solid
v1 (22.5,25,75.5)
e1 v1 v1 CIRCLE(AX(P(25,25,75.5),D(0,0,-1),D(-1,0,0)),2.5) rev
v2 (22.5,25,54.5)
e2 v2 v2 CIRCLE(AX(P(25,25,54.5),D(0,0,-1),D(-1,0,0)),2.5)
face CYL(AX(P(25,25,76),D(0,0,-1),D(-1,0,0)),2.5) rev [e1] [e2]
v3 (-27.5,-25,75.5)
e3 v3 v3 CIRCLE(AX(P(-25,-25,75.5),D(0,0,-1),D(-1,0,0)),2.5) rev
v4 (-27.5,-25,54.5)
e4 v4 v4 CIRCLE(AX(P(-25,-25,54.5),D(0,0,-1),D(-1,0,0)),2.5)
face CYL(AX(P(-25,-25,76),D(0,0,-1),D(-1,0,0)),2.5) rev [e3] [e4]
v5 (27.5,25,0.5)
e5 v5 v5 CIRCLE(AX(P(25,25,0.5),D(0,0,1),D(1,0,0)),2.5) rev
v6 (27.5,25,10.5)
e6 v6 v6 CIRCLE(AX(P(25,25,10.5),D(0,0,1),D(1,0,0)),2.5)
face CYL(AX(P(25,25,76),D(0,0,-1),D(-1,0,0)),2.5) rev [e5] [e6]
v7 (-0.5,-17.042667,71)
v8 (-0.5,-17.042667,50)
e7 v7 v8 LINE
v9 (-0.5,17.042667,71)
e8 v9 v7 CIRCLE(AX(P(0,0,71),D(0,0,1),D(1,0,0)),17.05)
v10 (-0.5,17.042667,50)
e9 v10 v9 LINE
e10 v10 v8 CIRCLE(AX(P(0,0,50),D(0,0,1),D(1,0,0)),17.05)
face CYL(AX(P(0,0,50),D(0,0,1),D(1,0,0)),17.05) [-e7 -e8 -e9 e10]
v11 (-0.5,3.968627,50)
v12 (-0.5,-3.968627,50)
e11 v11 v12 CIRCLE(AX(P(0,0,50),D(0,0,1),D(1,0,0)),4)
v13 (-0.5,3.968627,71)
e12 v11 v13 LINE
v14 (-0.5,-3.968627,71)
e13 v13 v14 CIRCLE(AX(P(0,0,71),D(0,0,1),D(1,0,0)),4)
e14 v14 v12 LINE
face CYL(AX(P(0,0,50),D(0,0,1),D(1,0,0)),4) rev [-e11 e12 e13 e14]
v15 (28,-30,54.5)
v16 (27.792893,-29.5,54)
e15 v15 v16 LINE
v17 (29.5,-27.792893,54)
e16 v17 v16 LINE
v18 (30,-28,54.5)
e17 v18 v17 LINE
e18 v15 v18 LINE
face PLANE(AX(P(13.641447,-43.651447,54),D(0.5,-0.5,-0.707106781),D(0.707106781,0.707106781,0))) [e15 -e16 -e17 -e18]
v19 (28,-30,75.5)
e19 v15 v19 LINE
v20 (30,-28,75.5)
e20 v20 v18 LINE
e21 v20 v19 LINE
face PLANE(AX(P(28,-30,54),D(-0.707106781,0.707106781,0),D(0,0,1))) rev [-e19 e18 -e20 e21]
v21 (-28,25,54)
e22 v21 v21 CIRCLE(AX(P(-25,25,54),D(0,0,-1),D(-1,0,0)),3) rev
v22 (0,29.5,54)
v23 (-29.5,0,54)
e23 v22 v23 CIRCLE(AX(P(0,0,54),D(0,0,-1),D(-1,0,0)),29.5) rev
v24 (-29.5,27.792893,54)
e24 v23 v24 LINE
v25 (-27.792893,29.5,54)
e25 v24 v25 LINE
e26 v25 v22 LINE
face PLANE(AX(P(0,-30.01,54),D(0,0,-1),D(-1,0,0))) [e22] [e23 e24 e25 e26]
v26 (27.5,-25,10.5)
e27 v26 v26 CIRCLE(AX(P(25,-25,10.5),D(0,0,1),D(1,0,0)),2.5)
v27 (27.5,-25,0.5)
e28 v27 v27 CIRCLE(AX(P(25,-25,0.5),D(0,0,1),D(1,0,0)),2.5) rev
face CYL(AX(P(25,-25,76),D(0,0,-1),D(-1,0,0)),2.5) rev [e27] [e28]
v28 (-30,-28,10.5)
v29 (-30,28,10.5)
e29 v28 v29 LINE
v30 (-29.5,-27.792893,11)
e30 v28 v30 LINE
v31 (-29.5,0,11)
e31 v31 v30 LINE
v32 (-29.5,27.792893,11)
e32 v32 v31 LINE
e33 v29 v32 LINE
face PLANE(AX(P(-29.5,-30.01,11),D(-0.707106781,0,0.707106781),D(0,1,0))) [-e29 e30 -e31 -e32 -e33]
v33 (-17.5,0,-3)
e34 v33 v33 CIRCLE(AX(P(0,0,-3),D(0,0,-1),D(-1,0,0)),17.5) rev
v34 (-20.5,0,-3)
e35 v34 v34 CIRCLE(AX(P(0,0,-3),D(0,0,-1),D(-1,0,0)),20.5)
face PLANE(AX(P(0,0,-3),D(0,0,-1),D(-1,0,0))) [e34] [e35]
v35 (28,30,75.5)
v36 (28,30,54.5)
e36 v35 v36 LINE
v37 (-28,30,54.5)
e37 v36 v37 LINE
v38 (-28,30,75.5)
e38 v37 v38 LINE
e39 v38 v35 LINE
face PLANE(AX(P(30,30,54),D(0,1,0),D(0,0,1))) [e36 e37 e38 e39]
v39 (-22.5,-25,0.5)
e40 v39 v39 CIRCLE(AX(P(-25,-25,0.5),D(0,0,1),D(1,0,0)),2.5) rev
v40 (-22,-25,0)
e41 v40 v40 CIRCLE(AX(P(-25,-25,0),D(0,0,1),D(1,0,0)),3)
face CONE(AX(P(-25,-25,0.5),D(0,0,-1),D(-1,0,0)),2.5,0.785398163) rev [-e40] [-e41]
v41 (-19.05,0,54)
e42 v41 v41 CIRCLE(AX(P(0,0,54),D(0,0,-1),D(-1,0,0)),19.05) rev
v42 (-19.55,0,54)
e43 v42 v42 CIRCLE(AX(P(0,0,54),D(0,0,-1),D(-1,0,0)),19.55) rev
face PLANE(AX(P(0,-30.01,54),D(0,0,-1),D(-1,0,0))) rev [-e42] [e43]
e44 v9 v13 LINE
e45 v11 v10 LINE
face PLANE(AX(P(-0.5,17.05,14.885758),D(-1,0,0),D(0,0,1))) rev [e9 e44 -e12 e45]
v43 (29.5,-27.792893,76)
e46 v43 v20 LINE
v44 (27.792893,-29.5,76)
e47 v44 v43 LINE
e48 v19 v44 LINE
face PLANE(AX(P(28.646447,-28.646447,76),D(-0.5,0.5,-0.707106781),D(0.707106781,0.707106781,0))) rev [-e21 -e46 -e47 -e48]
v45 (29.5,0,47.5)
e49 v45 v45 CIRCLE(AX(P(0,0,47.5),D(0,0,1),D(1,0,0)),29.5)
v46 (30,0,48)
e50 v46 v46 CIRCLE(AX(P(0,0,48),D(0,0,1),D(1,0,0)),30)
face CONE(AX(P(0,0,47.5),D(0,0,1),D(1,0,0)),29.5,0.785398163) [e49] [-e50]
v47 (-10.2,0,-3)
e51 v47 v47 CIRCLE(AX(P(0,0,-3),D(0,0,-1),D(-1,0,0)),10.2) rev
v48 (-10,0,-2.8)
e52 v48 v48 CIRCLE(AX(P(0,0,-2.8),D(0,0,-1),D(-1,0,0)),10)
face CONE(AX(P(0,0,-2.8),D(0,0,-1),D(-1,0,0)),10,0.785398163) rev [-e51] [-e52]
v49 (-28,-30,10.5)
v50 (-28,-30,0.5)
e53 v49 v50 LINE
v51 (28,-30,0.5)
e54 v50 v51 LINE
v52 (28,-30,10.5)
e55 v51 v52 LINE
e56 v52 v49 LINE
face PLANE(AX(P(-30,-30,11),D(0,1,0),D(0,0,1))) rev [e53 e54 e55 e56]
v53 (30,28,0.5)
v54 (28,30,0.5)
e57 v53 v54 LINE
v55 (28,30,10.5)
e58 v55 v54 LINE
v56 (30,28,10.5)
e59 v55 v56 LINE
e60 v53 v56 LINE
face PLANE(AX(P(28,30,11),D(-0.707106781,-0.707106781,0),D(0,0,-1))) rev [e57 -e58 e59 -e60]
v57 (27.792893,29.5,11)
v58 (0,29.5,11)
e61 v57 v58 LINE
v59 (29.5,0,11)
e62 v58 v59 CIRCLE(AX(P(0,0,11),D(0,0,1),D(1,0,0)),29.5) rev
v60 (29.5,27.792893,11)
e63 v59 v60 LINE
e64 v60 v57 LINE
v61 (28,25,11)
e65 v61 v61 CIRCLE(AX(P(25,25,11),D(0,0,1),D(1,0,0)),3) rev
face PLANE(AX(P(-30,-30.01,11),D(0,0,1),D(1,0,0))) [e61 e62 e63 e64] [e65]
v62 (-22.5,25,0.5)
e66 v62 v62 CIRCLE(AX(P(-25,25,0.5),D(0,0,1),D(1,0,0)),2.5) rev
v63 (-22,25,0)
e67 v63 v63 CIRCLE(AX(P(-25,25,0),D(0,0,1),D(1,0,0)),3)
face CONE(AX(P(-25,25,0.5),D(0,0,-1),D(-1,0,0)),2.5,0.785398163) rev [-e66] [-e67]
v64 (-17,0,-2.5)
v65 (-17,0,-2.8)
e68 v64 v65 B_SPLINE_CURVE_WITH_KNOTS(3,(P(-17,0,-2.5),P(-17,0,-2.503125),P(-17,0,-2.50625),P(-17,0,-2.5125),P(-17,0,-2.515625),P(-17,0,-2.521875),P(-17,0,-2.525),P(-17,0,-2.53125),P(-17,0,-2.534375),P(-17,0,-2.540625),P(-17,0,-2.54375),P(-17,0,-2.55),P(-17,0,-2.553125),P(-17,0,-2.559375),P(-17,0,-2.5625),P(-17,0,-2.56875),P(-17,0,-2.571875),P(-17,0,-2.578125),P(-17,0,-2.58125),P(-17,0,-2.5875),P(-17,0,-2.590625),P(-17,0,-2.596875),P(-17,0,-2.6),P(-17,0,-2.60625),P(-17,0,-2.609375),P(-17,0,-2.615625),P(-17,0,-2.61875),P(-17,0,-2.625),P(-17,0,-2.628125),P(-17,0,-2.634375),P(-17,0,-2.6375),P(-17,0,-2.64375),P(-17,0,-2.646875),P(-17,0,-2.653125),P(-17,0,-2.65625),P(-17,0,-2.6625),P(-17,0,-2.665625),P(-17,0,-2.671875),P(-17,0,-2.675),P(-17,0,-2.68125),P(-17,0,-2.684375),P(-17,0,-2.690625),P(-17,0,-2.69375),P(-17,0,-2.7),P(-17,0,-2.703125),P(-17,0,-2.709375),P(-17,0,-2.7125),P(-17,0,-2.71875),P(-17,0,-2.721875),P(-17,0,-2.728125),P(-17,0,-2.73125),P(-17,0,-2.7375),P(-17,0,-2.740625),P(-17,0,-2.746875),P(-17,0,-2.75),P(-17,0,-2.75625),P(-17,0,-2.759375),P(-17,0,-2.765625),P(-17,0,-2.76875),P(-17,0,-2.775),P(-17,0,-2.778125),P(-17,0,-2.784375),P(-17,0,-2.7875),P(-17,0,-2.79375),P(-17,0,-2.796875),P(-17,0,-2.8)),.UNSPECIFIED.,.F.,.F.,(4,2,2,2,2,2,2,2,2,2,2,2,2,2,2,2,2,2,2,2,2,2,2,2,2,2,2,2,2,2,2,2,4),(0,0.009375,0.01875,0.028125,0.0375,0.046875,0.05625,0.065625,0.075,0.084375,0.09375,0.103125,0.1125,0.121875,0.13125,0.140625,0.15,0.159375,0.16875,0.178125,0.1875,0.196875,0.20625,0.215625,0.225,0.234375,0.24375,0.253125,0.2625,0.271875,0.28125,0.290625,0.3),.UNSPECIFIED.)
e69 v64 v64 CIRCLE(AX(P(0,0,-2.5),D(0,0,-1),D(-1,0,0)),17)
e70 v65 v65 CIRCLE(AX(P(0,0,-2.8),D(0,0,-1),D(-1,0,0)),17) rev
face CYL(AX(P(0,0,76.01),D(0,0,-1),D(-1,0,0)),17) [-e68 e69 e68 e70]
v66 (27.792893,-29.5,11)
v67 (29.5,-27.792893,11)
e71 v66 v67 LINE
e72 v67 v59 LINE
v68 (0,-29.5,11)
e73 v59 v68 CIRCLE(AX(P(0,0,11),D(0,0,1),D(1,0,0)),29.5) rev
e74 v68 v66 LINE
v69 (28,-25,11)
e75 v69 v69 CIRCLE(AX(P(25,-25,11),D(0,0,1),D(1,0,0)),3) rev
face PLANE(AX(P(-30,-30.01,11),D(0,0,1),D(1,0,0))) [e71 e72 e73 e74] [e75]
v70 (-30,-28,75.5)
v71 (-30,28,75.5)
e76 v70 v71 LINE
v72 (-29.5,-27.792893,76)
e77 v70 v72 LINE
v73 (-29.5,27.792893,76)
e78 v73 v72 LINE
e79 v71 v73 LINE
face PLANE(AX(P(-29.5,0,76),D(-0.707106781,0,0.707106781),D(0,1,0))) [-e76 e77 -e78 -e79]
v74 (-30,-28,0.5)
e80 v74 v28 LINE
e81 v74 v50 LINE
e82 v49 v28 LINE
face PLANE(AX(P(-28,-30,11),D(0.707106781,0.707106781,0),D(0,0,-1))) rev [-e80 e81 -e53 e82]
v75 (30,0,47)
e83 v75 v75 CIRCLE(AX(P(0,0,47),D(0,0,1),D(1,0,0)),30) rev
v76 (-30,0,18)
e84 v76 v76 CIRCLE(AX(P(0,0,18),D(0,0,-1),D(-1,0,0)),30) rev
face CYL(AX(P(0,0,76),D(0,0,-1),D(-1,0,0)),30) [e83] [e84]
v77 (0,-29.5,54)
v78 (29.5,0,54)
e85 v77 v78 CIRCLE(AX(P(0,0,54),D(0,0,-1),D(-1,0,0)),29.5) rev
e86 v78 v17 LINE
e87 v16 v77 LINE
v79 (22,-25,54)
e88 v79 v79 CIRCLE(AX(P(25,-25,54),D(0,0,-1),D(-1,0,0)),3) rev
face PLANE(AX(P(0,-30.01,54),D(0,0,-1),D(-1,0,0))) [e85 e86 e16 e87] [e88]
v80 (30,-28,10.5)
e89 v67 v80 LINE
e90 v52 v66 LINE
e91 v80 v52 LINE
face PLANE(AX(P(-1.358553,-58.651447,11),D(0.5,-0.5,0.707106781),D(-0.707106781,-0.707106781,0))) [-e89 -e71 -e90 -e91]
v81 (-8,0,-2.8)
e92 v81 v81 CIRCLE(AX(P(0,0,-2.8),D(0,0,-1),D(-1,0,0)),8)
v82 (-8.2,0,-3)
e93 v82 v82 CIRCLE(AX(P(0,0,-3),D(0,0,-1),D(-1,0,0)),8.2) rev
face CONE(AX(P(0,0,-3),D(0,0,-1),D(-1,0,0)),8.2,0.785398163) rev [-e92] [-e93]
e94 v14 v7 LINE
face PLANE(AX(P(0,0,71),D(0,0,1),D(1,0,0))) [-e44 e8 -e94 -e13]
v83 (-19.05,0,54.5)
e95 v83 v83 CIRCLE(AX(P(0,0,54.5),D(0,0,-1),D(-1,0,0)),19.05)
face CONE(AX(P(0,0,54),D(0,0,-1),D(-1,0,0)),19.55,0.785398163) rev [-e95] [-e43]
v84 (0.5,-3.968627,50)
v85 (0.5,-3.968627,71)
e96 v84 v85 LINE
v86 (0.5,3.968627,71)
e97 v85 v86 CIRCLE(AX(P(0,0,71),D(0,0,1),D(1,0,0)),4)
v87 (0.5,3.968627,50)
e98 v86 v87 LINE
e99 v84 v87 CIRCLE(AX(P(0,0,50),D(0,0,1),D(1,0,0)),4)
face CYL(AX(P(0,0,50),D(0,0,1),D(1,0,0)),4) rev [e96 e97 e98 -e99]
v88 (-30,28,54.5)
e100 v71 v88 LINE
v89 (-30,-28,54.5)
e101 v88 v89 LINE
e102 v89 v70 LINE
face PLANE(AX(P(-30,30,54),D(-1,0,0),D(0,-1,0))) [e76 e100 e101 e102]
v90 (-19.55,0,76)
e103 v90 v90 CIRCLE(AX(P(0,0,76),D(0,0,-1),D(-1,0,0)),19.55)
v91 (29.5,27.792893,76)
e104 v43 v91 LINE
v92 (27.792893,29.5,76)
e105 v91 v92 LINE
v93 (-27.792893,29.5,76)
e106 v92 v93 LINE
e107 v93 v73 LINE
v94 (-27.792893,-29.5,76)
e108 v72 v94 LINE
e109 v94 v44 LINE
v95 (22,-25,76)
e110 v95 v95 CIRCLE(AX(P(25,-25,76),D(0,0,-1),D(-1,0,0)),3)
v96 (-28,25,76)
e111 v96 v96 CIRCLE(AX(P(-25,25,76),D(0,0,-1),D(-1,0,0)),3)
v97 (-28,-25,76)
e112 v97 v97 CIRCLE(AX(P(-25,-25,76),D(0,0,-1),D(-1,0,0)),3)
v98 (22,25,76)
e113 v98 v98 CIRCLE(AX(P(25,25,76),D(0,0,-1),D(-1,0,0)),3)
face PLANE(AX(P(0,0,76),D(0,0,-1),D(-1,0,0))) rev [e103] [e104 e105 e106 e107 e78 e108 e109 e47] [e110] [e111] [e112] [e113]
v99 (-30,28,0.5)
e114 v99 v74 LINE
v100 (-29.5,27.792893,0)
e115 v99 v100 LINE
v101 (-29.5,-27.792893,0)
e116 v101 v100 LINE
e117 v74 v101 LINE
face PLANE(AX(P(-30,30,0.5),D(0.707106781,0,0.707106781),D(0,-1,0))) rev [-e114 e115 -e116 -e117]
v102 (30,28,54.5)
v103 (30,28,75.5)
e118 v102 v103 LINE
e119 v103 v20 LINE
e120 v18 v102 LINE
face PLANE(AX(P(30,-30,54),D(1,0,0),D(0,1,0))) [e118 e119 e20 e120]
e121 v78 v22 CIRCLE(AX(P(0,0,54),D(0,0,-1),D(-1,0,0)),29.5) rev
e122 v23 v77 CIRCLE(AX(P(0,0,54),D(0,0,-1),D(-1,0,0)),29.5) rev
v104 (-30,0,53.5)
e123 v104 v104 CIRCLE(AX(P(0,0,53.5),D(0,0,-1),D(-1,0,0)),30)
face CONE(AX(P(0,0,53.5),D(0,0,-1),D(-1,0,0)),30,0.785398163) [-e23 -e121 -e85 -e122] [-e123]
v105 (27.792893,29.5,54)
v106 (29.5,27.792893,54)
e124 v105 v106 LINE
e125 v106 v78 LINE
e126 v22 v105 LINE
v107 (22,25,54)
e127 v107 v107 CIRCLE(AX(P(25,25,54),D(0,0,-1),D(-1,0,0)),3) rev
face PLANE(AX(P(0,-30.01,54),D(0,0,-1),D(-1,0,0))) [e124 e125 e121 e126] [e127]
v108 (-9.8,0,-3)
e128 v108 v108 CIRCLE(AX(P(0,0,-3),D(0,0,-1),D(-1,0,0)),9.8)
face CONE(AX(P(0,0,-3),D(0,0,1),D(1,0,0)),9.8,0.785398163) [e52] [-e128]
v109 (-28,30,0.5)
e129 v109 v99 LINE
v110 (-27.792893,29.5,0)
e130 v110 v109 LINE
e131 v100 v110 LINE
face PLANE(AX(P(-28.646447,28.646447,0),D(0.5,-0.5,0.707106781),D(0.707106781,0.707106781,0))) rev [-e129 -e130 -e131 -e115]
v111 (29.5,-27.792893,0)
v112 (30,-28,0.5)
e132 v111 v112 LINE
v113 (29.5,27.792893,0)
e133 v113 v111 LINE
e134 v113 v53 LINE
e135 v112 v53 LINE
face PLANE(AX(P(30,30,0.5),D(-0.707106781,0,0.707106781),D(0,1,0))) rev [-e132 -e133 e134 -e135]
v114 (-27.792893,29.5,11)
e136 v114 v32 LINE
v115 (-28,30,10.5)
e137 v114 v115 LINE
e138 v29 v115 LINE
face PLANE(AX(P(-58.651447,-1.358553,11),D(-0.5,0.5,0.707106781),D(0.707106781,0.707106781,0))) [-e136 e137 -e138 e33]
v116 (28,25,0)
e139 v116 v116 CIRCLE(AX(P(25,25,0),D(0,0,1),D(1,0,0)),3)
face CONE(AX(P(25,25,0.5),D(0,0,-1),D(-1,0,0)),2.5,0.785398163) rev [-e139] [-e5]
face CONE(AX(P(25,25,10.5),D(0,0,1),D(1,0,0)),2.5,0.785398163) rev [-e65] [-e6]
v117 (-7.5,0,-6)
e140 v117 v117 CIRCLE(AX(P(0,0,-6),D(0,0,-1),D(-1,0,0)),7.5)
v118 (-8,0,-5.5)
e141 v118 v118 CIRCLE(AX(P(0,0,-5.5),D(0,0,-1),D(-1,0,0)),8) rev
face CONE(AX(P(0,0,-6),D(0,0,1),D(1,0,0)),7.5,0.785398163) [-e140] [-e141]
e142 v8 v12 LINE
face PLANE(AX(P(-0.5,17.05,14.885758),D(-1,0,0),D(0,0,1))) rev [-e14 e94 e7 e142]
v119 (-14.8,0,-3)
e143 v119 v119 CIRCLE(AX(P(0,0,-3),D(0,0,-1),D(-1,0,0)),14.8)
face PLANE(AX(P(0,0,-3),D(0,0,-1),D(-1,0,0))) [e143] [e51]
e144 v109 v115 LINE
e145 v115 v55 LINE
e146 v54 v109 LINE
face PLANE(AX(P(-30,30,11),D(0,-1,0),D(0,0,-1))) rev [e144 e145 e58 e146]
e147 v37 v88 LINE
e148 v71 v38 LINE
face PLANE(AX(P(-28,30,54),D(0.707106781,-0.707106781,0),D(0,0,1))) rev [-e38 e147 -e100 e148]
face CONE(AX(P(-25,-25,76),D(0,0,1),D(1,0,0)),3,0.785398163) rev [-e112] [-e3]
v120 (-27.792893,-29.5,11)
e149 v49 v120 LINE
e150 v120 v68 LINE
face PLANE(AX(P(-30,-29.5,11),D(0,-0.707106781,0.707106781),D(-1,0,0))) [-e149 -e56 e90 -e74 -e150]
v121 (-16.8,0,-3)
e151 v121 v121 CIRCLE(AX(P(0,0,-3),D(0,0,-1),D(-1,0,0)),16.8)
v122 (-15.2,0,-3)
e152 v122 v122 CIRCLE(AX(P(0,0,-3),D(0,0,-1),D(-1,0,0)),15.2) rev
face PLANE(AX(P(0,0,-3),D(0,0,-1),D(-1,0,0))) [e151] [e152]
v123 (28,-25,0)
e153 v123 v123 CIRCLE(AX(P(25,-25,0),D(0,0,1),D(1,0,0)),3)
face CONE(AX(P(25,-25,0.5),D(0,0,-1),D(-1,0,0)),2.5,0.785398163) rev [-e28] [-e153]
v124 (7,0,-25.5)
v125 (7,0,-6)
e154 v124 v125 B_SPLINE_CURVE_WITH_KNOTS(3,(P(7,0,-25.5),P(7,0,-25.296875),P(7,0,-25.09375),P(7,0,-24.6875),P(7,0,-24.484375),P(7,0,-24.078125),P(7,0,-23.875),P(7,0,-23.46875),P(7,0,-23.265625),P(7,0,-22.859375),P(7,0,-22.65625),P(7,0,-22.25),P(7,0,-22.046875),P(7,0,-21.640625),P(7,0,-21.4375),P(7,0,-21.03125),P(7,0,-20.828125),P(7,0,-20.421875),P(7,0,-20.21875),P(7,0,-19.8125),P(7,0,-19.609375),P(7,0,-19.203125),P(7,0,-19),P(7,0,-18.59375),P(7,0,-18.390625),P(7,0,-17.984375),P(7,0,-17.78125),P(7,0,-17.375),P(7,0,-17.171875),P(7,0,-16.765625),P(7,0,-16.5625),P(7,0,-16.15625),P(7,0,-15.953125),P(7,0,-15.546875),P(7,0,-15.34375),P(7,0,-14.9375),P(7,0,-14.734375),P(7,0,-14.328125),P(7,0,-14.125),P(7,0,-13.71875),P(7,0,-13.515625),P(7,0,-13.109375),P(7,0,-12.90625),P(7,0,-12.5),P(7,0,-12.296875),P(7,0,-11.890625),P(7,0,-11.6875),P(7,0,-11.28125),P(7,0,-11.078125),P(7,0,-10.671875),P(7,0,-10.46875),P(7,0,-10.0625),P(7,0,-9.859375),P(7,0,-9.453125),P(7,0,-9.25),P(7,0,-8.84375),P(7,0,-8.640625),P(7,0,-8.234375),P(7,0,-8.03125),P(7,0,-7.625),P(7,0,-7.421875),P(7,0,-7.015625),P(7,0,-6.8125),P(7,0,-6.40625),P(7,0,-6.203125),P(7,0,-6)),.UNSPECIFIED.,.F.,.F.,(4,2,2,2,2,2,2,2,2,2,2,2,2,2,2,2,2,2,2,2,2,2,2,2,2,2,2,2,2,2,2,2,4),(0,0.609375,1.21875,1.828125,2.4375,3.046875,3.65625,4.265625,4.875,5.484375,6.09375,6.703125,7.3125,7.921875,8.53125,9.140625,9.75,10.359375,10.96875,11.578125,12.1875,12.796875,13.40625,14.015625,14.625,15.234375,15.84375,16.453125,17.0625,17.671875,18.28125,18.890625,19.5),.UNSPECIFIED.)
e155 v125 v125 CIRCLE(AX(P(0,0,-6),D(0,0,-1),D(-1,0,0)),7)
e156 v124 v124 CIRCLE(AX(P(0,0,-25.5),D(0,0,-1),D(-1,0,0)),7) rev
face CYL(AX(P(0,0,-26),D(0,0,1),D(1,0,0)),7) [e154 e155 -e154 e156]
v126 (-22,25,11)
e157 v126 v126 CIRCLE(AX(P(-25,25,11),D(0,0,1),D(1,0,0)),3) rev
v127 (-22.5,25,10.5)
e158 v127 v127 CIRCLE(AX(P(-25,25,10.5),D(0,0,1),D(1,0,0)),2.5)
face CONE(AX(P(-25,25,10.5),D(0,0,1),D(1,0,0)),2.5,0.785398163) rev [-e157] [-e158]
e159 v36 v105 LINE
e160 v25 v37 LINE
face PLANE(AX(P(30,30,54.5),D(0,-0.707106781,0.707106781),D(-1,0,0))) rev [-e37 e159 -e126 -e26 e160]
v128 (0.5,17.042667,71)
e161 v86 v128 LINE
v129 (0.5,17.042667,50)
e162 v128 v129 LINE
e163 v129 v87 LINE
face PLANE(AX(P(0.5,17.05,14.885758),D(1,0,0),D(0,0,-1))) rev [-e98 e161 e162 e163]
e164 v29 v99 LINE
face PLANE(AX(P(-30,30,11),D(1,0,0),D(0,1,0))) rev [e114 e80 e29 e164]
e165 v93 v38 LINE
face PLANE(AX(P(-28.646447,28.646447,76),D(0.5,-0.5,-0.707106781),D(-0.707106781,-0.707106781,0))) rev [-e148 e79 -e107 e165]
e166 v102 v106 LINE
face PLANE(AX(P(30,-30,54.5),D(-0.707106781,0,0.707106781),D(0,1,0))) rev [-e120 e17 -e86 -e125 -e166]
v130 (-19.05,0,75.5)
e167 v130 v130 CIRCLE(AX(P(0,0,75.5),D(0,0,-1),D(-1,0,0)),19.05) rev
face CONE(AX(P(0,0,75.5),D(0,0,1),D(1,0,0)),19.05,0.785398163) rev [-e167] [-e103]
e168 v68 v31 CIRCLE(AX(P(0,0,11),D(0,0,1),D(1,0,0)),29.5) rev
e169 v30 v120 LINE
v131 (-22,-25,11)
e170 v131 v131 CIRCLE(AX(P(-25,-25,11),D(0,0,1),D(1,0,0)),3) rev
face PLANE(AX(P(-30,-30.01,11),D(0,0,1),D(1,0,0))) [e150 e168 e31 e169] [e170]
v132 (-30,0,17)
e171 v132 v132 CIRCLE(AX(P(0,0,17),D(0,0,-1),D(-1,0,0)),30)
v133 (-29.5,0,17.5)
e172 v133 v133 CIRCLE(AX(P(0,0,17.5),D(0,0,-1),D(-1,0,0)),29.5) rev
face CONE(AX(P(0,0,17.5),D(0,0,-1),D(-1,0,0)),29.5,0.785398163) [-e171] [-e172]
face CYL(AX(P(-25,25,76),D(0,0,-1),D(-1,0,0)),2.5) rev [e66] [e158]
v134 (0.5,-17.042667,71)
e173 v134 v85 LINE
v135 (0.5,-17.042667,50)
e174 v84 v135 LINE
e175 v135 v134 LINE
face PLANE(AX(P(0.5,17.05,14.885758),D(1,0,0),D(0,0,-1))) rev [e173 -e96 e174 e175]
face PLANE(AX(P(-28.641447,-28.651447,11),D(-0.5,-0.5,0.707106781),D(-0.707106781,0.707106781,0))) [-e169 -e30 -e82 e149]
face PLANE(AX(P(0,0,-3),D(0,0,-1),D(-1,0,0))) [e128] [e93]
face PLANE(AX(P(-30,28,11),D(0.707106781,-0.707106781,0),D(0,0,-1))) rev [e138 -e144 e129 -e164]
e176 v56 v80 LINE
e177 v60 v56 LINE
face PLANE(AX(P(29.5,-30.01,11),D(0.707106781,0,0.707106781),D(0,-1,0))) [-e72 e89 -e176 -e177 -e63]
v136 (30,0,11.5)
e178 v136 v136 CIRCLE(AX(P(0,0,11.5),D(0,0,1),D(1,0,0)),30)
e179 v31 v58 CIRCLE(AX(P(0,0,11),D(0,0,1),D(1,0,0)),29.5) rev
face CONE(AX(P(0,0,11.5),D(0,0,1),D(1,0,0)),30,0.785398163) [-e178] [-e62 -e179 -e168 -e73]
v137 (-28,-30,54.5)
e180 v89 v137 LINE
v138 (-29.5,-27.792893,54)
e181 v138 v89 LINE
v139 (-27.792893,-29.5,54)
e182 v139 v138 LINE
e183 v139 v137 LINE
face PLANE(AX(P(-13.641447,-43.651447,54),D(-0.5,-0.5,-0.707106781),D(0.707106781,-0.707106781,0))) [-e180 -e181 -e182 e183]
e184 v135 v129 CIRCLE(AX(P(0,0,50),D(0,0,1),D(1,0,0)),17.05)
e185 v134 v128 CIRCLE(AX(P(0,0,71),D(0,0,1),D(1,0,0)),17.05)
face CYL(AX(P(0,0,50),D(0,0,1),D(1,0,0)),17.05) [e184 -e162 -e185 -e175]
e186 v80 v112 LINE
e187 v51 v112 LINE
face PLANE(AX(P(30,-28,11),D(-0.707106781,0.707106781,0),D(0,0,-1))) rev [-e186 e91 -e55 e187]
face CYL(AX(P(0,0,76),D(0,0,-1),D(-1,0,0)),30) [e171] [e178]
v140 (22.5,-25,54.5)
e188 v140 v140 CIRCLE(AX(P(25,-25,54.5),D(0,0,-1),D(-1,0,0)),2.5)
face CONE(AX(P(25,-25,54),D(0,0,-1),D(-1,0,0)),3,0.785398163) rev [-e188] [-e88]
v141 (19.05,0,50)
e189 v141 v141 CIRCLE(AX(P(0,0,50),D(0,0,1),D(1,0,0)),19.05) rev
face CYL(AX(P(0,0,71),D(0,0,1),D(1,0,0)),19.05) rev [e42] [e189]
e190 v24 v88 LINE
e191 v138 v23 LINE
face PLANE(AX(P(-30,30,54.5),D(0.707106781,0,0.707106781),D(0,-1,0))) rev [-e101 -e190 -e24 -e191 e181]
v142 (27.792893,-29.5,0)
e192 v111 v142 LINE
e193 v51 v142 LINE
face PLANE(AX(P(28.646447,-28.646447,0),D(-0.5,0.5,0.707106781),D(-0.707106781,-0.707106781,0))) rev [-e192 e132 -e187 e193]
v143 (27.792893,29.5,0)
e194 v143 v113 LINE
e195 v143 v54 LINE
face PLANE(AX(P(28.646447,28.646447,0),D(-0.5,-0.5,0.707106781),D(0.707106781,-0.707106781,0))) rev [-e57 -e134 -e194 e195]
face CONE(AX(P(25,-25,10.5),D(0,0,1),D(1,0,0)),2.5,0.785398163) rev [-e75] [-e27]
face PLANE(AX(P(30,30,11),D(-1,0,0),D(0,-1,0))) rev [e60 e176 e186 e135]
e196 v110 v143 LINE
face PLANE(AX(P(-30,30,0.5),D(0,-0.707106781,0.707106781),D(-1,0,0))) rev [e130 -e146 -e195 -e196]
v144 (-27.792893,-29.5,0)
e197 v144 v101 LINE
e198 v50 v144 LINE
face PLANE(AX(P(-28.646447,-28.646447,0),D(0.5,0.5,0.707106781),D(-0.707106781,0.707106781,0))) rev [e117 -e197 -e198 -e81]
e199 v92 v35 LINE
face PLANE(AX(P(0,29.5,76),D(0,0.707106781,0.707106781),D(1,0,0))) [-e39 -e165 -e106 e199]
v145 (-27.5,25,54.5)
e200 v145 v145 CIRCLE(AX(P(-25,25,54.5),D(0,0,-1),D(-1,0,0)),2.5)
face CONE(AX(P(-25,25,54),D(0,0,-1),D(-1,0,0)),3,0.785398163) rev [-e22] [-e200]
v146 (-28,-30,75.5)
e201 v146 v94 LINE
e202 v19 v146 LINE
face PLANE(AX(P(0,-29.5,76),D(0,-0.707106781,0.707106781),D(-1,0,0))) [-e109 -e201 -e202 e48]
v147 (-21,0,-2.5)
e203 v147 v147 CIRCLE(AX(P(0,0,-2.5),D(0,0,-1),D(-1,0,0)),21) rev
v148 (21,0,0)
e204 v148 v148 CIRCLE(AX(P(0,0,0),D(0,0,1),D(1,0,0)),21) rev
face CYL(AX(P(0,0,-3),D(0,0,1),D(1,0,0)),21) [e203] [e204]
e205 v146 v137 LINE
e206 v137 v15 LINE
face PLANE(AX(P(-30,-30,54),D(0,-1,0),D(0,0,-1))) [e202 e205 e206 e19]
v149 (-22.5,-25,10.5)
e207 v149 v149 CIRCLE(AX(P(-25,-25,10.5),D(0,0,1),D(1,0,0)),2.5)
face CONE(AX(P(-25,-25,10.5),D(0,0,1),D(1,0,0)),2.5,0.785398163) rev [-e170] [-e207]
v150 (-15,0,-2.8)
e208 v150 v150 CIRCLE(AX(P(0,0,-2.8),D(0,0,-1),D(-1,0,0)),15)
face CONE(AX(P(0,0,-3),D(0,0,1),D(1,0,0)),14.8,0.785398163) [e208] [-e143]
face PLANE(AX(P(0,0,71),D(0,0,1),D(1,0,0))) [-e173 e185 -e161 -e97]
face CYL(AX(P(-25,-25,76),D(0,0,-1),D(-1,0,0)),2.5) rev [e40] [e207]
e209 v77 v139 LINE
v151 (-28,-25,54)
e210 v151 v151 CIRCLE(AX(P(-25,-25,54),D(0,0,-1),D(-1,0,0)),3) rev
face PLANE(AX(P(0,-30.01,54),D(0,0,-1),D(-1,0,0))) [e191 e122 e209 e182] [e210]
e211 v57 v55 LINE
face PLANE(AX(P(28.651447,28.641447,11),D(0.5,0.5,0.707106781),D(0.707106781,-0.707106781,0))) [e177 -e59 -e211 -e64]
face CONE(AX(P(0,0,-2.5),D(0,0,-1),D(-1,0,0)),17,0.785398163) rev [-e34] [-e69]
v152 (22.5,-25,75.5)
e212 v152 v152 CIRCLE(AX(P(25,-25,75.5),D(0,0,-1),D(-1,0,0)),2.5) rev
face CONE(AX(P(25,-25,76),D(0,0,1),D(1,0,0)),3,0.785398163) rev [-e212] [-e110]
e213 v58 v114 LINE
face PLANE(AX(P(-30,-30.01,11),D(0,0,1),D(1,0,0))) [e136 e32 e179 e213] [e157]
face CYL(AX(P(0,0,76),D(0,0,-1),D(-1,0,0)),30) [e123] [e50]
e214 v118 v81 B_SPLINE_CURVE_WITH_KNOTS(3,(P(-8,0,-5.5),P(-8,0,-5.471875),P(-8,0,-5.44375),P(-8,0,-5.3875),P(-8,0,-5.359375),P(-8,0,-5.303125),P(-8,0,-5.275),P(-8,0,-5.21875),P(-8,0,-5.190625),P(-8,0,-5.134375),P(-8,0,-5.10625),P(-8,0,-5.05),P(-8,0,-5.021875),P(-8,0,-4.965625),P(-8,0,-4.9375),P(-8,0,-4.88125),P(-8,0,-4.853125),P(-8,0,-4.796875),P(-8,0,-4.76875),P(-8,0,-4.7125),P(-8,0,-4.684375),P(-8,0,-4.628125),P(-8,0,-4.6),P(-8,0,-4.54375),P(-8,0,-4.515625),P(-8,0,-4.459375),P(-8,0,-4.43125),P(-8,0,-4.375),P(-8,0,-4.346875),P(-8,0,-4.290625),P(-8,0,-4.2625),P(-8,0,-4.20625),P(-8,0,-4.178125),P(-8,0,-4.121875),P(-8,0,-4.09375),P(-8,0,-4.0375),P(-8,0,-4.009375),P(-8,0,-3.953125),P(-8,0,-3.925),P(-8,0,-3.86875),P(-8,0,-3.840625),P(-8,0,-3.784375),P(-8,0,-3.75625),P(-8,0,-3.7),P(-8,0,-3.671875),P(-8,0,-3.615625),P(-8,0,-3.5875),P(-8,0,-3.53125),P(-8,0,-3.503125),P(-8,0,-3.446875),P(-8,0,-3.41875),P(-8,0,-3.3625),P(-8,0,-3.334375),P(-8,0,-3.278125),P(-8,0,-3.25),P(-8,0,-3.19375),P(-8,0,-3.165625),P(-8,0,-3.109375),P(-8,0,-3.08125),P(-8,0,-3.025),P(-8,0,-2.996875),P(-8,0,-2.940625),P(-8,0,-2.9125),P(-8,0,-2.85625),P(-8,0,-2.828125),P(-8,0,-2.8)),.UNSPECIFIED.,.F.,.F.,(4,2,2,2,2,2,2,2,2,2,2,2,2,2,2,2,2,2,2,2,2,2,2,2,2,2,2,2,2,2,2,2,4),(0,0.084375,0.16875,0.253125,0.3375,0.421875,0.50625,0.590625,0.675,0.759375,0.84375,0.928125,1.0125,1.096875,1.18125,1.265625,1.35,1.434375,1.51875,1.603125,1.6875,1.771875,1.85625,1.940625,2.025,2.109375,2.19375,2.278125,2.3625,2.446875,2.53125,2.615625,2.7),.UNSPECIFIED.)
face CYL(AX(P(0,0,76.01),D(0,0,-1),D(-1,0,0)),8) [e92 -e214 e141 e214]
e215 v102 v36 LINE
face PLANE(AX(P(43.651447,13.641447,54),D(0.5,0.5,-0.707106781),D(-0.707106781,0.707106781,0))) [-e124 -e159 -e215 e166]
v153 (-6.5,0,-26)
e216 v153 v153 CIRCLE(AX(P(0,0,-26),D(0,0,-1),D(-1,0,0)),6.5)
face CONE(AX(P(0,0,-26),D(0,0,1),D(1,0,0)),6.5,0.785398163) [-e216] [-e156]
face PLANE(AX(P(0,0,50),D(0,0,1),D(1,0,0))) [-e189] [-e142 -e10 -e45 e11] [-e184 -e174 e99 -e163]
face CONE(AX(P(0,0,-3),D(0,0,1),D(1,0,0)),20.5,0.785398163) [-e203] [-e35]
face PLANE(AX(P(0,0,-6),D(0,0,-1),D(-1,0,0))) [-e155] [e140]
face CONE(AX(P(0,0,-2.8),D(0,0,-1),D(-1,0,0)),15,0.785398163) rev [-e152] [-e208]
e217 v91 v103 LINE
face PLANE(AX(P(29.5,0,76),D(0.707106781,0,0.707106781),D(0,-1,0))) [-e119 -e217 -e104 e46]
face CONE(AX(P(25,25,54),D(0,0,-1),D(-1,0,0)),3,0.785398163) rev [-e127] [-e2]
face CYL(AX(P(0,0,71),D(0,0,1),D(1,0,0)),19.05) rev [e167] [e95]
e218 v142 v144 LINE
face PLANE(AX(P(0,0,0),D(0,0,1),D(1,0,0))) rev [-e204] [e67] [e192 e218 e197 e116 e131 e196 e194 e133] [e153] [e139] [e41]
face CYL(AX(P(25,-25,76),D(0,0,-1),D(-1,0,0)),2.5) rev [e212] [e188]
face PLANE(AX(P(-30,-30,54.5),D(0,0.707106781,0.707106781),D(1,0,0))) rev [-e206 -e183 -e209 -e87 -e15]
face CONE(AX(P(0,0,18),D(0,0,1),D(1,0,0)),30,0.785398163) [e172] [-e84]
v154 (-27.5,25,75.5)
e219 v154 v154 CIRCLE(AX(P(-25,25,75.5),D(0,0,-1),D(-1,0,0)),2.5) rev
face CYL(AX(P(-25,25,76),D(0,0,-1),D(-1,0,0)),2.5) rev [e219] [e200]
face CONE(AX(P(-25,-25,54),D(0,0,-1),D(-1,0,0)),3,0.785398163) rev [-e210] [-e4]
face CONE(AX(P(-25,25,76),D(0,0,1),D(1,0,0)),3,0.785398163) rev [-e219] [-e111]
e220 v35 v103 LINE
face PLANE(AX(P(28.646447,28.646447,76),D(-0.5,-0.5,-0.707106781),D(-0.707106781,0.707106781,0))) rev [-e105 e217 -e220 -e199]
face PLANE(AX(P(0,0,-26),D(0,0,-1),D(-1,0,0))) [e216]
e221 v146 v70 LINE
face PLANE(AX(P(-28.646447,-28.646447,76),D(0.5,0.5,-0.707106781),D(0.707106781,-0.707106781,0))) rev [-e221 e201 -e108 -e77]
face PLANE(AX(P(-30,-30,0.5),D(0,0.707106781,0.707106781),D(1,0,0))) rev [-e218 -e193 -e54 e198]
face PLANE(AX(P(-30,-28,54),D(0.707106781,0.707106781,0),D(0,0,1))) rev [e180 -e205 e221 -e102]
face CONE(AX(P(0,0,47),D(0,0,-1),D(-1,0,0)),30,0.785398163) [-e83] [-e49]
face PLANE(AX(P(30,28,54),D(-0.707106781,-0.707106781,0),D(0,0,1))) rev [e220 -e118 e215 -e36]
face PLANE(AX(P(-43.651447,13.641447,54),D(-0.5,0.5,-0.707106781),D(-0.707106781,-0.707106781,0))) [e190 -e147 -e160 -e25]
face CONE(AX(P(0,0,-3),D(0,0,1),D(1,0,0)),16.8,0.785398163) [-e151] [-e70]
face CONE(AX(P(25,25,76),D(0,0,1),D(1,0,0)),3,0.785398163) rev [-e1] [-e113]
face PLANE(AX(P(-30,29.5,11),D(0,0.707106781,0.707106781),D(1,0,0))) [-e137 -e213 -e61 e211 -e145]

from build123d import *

# Parameters (mm, degrees)
SKETCH1_W                = 60
SKETCH1_H                = 60
EXTRUDE1_DEPTH           = 11
SKETCH2_R                = 30
EXTRUDE2_DEPTH           = 76
SKETCH3_W                = 60
SKETCH3_H                = 60
EXTRUDE3_DEPTH           = 22
SKETCH4_R                = 2.5
EXTRUDE4_DEPTH           = 88.040220588
CHAMFER1_SIZE            = 2
SKETCH6_R                = 19.05
EXTRUDE5_DEPTH           = 5
SKETCH7_R                = 19.05
SKETCH7_R_2              = 17.05
SKETCH7_R_3              = 4
EXTRUDE6_DEPTH           = 26
SKETCH8_R                = 21
EXTRUDE7_DEPTH           = 3
SKETCH9_R                = 7
EXTRUDE8_DEPTH           = 26
SKETCH10_R               = 8
EXTRUDE9_DEPTH           = 6
SPLIT1_START             = -26
SPLIT1_OUTLINE_R         = 7
SPLIT1_DEPTH             = 76
SPLIT1_START_2           = -6
SPLIT1_2_OUTLINE_R       = 8
SPLIT1_2_OUTLINE_R_2     = 4
SPLIT1_2_DEPTH           = 77
SPLIT1_START_3           = -3
SPLIT1_3_OUTLINE_R       = 10
SPLIT1_3_OUTLINE_R_2     = 8
SPLIT1_3_DEPTH           = 74
SPLIT1_4_OUTLINE_R       = 15
SPLIT1_4_OUTLINE_R_2     = 10
SPLIT1_4_DEPTH           = 74
SPLIT1_5_OUTLINE_R       = 17
SPLIT1_5_OUTLINE_R_2     = 15
SPLIT1_5_DEPTH           = 74
SPLIT1_6_OUTLINE_R       = 17
SPLIT1_6_DEPTH           = 97
CHAMFER2_SIZE            = 0.2
CHAMFER3_SIZE            = 0.2
CHAMFER4_SIZE            = 0.2
CHAMFER5_SIZE            = 0.5
CHAMFER6_SIZE            = 0.5
CHAMFER7_SIZE            = 0.5
EXTRUDE10_DEPTH          = 21
SPLIT2_START             = 11
SPLIT2_OUTLINE_R         = 2.5
SPLIT2_DEPTH             = 65
SPLIT2_START_2           = 54
SPLIT2_2_OUTLINE_R       = 2.5
SPLIT2_2_OUTLINE_R_2     = 19.05
SPLIT2_2_DEPTH           = 22
SPLIT2_3_OUTLINE_R       = 30
SPLIT2_3_DEPTH           = 39
SPLIT2_START_3           = 50
SPLIT2_4_OUTLINE_R       = 30
SPLIT2_4_OUTLINE_R_2     = 19.05
SPLIT2_4_DEPTH           = 4
SPLIT2_5_DEPTH           = 17
SPLIT2_6_DEPTH           = 17
CHAMFER8_SIZE            = 0.5
CHAMFER9_SIZE            = 0.5
CHAMFER10_SIZE           = 0.5
CHAMFER11_SIZE           = 0.5
SPLIT3_SURFACE_1_1_BACK  = 133.68
SPLIT3_SURFACE_1_1_DEPTH = 267.36
SPLIT3_SURFACE_1_2_BACK  = 133.68
SPLIT3_SURFACE_1_2_DEPTH = 267.36
SPLIT3_SURFACE_2_3_BACK  = 133.68
SPLIT3_SURFACE_2_3_DEPTH = 267.36
SPLIT3_SURFACE_2_4_BACK  = 133.68
SPLIT3_SURFACE_2_4_DEPTH = 267.36
CHAMFER12_SIZE           = 0.5
CHAMFER13_SIZE           = 0.5
CHAMFER14_SIZE           = 0.5


# Read off the part's stored shape, not the designer's step: Split1, Split2
with BuildPart() as part:
    # Sketch1 → Extrude1 (new body)
    with BuildSketch(Plane.XY):
        Rectangle(SKETCH1_W, SKETCH1_H)
    extrude(amount=EXTRUDE1_DEPTH)

    # Sketch2 → Extrude2 (add)
    with BuildSketch(Plane(origin=(0, 0, 0), x_dir=(-1, 0, 0), z_dir=(0, 0, -1))):
        Circle(SKETCH2_R)
    extrude(amount=-EXTRUDE2_DEPTH)

    # Sketch3 → Extrude3 (add)
    with BuildSketch(Plane.XY.offset(76)):
        Rectangle(SKETCH3_W, SKETCH3_H)
    extrude(amount=-EXTRUDE3_DEPTH)

    # Sketch4 → Extrude4 (cut, through all)
    with BuildSketch(Plane(origin=(0, 0, 0), x_dir=(-1, 0, 0), z_dir=(0, 0, -1))):
        with Locations((-25, 25)):
            Circle(SKETCH4_R)
        with Locations((25, 25)):
            Circle(SKETCH4_R)
        with Locations((25, -25)):
            Circle(SKETCH4_R)
        with Locations((-25, -25)):
            Circle(SKETCH4_R)
    extrude(amount=-EXTRUDE4_DEPTH, mode=Mode.SUBTRACT)

    # Chamfer1
    chamfer1_edges = [part.edges().sort_by_distance(p)[0] for p in [
        (-30, 30, 65),
        (30, 30, 65),
        (30, -30, 65),
        (-30, -30, 65),
        (30, -30, 5.5),
        (-30, -30, 5.5),
        (-30, 30, 5.5),
        (30, 30, 5.5),
    ]]
    chamfer(chamfer1_edges, length=CHAMFER1_SIZE)

    # Sketch6 → Extrude5 (cut)
    with BuildSketch(Plane.XY.offset(76)):
        Circle(SKETCH6_R)
    extrude(amount=-EXTRUDE5_DEPTH, mode=Mode.SUBTRACT)

    # Sketch7 → Extrude6 (cut)
    # profile 1 of 2: a face of its own
    with BuildSketch(Plane.XY.offset(76)):
        Circle(SKETCH7_R)
        Circle(SKETCH7_R_2, mode=Mode.SUBTRACT)
    # profile 2 of 2: a face of its own
    with BuildSketch(Plane.XY.offset(76)):
        Circle(SKETCH7_R_3)
    extrude(amount=-EXTRUDE6_DEPTH, mode=Mode.SUBTRACT)

    # Sketch8 → Extrude7 (add)
    with BuildSketch(Plane(origin=(0, 0, 0), x_dir=(-1, 0, 0), z_dir=(0, 0, -1))):
        with Locations(Location((0, 0, 0), (0, 0, 180))):
            Circle(SKETCH8_R)
    extrude(amount=EXTRUDE7_DEPTH)

    # Sketch9 → Extrude8 (add)
    with BuildSketch(Plane(origin=(0, 0, 0), x_dir=(-1, 0, 0), z_dir=(0, 0, -1))):
        with Locations(Location((0, 0, 0), (0, 0, 180))):
            Circle(SKETCH9_R)
    extrude(amount=EXTRUDE8_DEPTH)

    # Sketch10 → Extrude9 (add)
    with BuildSketch(Plane(origin=(0, 0, 0), x_dir=(-1, 0, 0), z_dir=(0, 0, -1))):
        Circle(SKETCH10_R)
    extrude(amount=EXTRUDE9_DEPTH)

    # Split1 6 outline → Split1 6 (cut)
    with BuildSketch(Plane.XY.offset(SPLIT1_START)):
        Circle(SPLIT1_6_OUTLINE_R)
    extrude(amount=SPLIT1_6_DEPTH, mode=Mode.SUBTRACT)

    # Chamfer5
    chamfer5_edges = [part.edges().sort_by_distance(p)[0] for p in [
        (-21, 0, -3),
        (-17, 0, -3),
    ]]
    chamfer(chamfer5_edges, length=CHAMFER5_SIZE)


with BuildPart() as body_2:
    # Split1 outline → Split1 (new body)
    with BuildSketch(Plane.XY.offset(SPLIT1_START)):
        Circle(SPLIT1_OUTLINE_R)
    extrude(amount=SPLIT1_DEPTH)

    # Split1 2 outline → Split1 2 (add)
    with BuildSketch(Plane.XY.offset(SPLIT1_START_2)):
        Circle(SPLIT1_2_OUTLINE_R)
        Circle(SPLIT1_2_OUTLINE_R_2, mode=Mode.SUBTRACT)
    extrude(amount=SPLIT1_2_DEPTH)


with BuildPart() as body_3:
    # Split1 3 outline → Split1 3 (new body)
    with BuildSketch(Plane.XY.offset(SPLIT1_START_3)):
        Circle(SPLIT1_3_OUTLINE_R)
        Circle(SPLIT1_3_OUTLINE_R_2, mode=Mode.SUBTRACT)
    extrude(amount=SPLIT1_3_DEPTH)

    # Chamfer2
    chamfer2_edges = [body_3.edges().sort_by_distance(p)[0] for p in [
        (-8, 0, -3),
        (-10, 0, -3),
    ]]
    chamfer(chamfer2_edges, length=CHAMFER2_SIZE)


with BuildPart() as body_4:
    # Split1 4 outline → Split1 4 (new body)
    with BuildSketch(Plane.XY.offset(SPLIT1_START_3)):
        Circle(SPLIT1_4_OUTLINE_R)
        Circle(SPLIT1_4_OUTLINE_R_2, mode=Mode.SUBTRACT)
    extrude(amount=SPLIT1_4_DEPTH)

    # Chamfer3
    chamfer3_edges = [body_4.edges().sort_by_distance(p)[0] for p in [
        (-15, 0, -3),
        (-10, 0, -3),
    ]]
    chamfer(chamfer3_edges, length=CHAMFER3_SIZE)


with BuildPart() as body_5:
    # Split1 5 outline → Split1 5 (new body)
    with BuildSketch(Plane.XY.offset(SPLIT1_START_3)):
        Circle(SPLIT1_5_OUTLINE_R)
        Circle(SPLIT1_5_OUTLINE_R_2, mode=Mode.SUBTRACT)
    extrude(amount=SPLIT1_5_DEPTH)

    # Chamfer4
    chamfer4_edges = [body_5.edges().sort_by_distance(p)[0] for p in [
        (-17, 0, -3),
        (-15, 0, -3),
    ]]
    chamfer(chamfer4_edges, length=CHAMFER4_SIZE)


with BuildPart() as part_1:
    add(part.part)

    # Combine1: union body 5, body 4, body 3, body 2
    add(body_5.part)
    add(body_4.part)
    add(body_3.part)
    add(body_2.part)

    # Chamfer6
    chamfer6_edges = [part_1.edges().sort_by_distance(p)[0] for p in [
        (-8, 0, -6),
    ]]
    chamfer(chamfer6_edges, length=CHAMFER6_SIZE)

    # Chamfer7
    chamfer7_edges = [part_1.edges().sort_by_distance(p)[0] for p in [
        (-7, 0, -26),
    ]]
    chamfer(chamfer7_edges, length=CHAMFER7_SIZE)

    # Sketch12 → Extrude10 (cut)
    with BuildSketch(Plane.XY.offset(71)):
        with BuildLine():
            Line((0.5, 17.05), (0.5, -17.05))
            ThreePointArc((0.5, -17.05), (0, -17.55), (-0.5, -17.05))
            Line((-0.5, -17.05), (-0.5, 17.05))
            ThreePointArc((-0.5, 17.05), (0, 17.55), (0.5, 17.05))
        make_face()
    extrude(amount=-EXTRUDE10_DEPTH, mode=Mode.SUBTRACT)

    # Split2 outline → Split2 (cut)
    with BuildSketch(Plane.XY.offset(SPLIT2_START)):
        Polygon((30, -28), (30, 28), (28, 30), (-28, 30), (-30, 28), (-30, -28), (-28, -30), (28, -30), align=None)
        with Locations((25, -25)):
            Circle(SPLIT2_OUTLINE_R, mode=Mode.SUBTRACT)
        with Locations((-25, -25)):
            Circle(SPLIT2_OUTLINE_R, mode=Mode.SUBTRACT)
        with Locations((-25, 25)):
            Circle(SPLIT2_OUTLINE_R, mode=Mode.SUBTRACT)
        with Locations((25, 25)):
            Circle(SPLIT2_OUTLINE_R, mode=Mode.SUBTRACT)
    extrude(amount=SPLIT2_DEPTH, mode=Mode.SUBTRACT)

    # Chamfer10
    chamfer10_edges = [part_1.edges().sort_by_distance(p)[0] for p in [
        (29, 29, 11),
        (-29, 29, 11),
        (29, -29, 11),
        (-29, -29, 11),
        (-29, -29, 0),
        (29, -29, 0),
        (-29, 29, 0),
        (29, 29, 0),
        (0, -30, 11),
        (-30, 0, 11),
        (0, 30, 11),
        (30, 0, 11),
        (0, -30, 0),
        (-30, 0, 0),
        (0, 30, 0),
        (30, 0, 0),
        (27.5, -25, 11),
        (-22.5, -25, 11),
        (-22.5, 25, 11),
        (27.5, 25, 11),
    ]]
    chamfer(chamfer10_edges, length=CHAMFER10_SIZE)

    # Chamfer11
    chamfer11_edges = [part_1.edges().sort_by_distance(p)[0] for p in [
        (27.5, 25, 0),
        (-22.5, 25, 0),
        (-22.5, -25, 0),
        (27.5, -25, 0),
    ]]
    chamfer(chamfer11_edges, length=CHAMFER11_SIZE)


with BuildPart() as body_2_2:
    # Split2 2 outline → Split2 2 (new body)
    with BuildSketch(Plane.XY.offset(SPLIT2_START_2)):
        Polygon((30, 28), (28, 30), (-28, 30), (-30, 28), (-30, -28), (-28, -30), (28, -30), (30, -28), align=None)
        with Locations((-25, -25)):
            Circle(SPLIT2_2_OUTLINE_R, mode=Mode.SUBTRACT)
        with Locations((25, -25)):
            Circle(SPLIT2_2_OUTLINE_R, mode=Mode.SUBTRACT)
        with Locations((-25, 25)):
            Circle(SPLIT2_2_OUTLINE_R, mode=Mode.SUBTRACT)
        Circle(SPLIT2_2_OUTLINE_R_2, mode=Mode.SUBTRACT)
        with Locations((25, 25)):
            Circle(SPLIT2_2_OUTLINE_R, mode=Mode.SUBTRACT)
    extrude(amount=SPLIT2_2_DEPTH)

    # Chamfer9
    chamfer9_edges = [body_2_2.edges().sort_by_distance(p)[0] for p in [
        (29, 29, 54),
        (-29, 29, 54),
        (29, -29, 54),
        (-29, -29, 54),
        (-29, -29, 76),
        (29, -29, 76),
        (-29, 29, 76),
        (29, 29, 76),
        (30, 0, 54),
        (0, -30, 54),
        (-30, 0, 54),
        (0, 30, 54),
        (30, 0, 76),
        (0, -30, 76),
        (-30, 0, 76),
        (0, 30, 76),
        (22.5, -25, 54),
        (-27.5, -25, 54),
        (-27.5, 25, 54),
        (22.5, 25, 54),
        (22.5, 25, 76),
        (-27.5, 25, 76),
        (-27.5, -25, 76),
        (22.5, -25, 76),
        (-19.05, 0, 76),
        (-19.05, 0, 54),
    ]]
    chamfer(chamfer9_edges, length=CHAMFER9_SIZE)


with BuildPart() as body_3_2:
    # Split2 3 outline → Split2 3 (new body)
    with BuildSketch(Plane.XY.offset(SPLIT2_START)):
        Circle(SPLIT2_3_OUTLINE_R)
    extrude(amount=SPLIT2_3_DEPTH)

    # Split2 4 outline → Split2 4 (add)
    # profile 1 of 3: a face of its own
    with BuildSketch(Plane.XY.offset(SPLIT2_START_3)):
        Circle(SPLIT2_4_OUTLINE_R)
        Circle(SPLIT2_4_OUTLINE_R_2, mode=Mode.SUBTRACT)
    # profile 2 of 3: a face of its own
    with BuildSketch(Plane.XY.offset(SPLIT2_START_3)):
        with BuildLine():
            ThreePointArc((0.5, 3.968626967), (4, 0), (0.5, -3.968626967))
            Line((0.5, -3.968626967), (0.5, -17.042667045))
            ThreePointArc((0.5, -17.042667045), (17.05, 0), (0.5, 17.042667045))
            Line((0.5, 17.042667045), (0.5, 3.968626967))
        make_face()
    # profile 3 of 3: a face of its own
    with BuildSketch(Plane.XY.offset(SPLIT2_START_3)):
        with BuildLine():
            Line((-0.5, 3.968626967), (-0.5, 17.042667045))
            ThreePointArc((-0.5, 17.042667045), (-17.05, 0), (-0.5, -17.042667045))
            Line((-0.5, -17.042667045), (-0.5, -3.968626967))
            ThreePointArc((-0.5, -3.968626967), (-4, 0), (-0.5, 3.968626967))
        make_face()
    extrude(amount=SPLIT2_4_DEPTH)

    # Chamfer8
    chamfer8_edges = [body_3_2.edges().sort_by_distance(p)[0] for p in [
        (-30, 0, 54),
        (-30, 0, 11),
    ]]
    chamfer(chamfer8_edges, length=CHAMFER8_SIZE)


with BuildPart() as body_4_2:
    # Split2 5 outline → Split2 5 (new body)
    with BuildSketch(Plane.XY.offset(SPLIT2_START_2)):
        with BuildLine():
            Line((-0.5, 3.968626967), (-0.5, 17.042667045))
            ThreePointArc((-0.5, 17.042667045), (-17.05, 0), (-0.5, -17.042667045))
            Line((-0.5, -17.042667045), (-0.5, -3.968626967))
            ThreePointArc((-0.5, -3.968626967), (-4, 0), (-0.5, 3.968626967))
        make_face()
    extrude(amount=SPLIT2_5_DEPTH)


with BuildPart() as body_5_2:
    # Split2 6 outline → Split2 6 (new body)
    with BuildSketch(Plane.XY.offset(SPLIT2_START_2)):
        with BuildLine():
            ThreePointArc((0.5, 3.968626967), (4, 0), (0.5, -3.968626967))
            Line((0.5, -3.968626967), (0.5, -17.042667045))
            ThreePointArc((0.5, -17.042667045), (17.05, 0), (0.5, 17.042667045))
            Line((0.5, 17.042667045), (0.5, 3.968626967))
        make_face()
    extrude(amount=SPLIT2_6_DEPTH)

    # Combine2: union body 4 2, body 3 2, body 2 2, part
    add(body_4_2.part)
    add(body_3_2.part)
    add(body_2_2.part)
    add(part_1.part)


with BuildPart() as body_2_3:
    # Split3: the piece behind the surface
    add(body_5_2.part)
    # Split3 surface 1: a surface, the sketch's curves swept straight by 267.36 mm
    with BuildLine(Plane(origin=(0, 0, 0), x_dir=(1, 0, 0), z_dir=(0, 1, 0)).offset(-SPLIT3_SURFACE_1_1_BACK), mode=Mode.PRIVATE) as split3_surface_1_1_path:
        Line((30, -17.5), (-30, -17.5))
    split3_surface_1_1 = Shell.extrude(split3_surface_1_1_path.wire(), (0 * SPLIT3_SURFACE_1_1_DEPTH, 1 * SPLIT3_SURFACE_1_1_DEPTH, 0 * SPLIT3_SURFACE_1_1_DEPTH))
    split(bisect_by=split3_surface_1_1, keep=Keep.BOTTOM)

    # Chamfer13
    chamfer13_edges = [body_2_3.edges().sort_by_distance(p)[0] for p in [
        (0, -30, 17.5),
    ]]
    chamfer(chamfer13_edges, length=CHAMFER13_SIZE)


with BuildPart() as body_5_2_1:
    add(body_5_2.part)

    # Split3: split by a surface, the side it looks to stays
    # Split3 surface 1: a surface, the sketch's curves swept straight by 267.36 mm
    with BuildLine(Plane(origin=(0, 0, 0), x_dir=(1, 0, 0), z_dir=(0, 1, 0)).offset(-SPLIT3_SURFACE_1_2_BACK), mode=Mode.PRIVATE) as split3_surface_1_2_path:
        Line((30, -17.5), (-30, -17.5))
    split3_surface_1_2 = Shell.extrude(split3_surface_1_2_path.wire(), (0 * SPLIT3_SURFACE_1_2_DEPTH, 1 * SPLIT3_SURFACE_1_2_DEPTH, 0 * SPLIT3_SURFACE_1_2_DEPTH))
    split(bisect_by=split3_surface_1_2, keep=Keep.TOP)


with BuildPart() as body_3_3:
    # Split3 2: the piece behind the surface
    add(body_5_2_1.part)
    # Split3 surface 2: a surface, the sketch's curves swept straight by 267.36 mm
    with BuildLine(Plane(origin=(0, 0, 0), x_dir=(1, 0, 0), z_dir=(0, 1, 0)).offset(-SPLIT3_SURFACE_2_3_BACK), mode=Mode.PRIVATE) as split3_surface_2_3_path:
        Line((-30, -47.5), (30, -47.5))
    split3_surface_2_3 = Shell.extrude(split3_surface_2_3_path.wire(), (0 * SPLIT3_SURFACE_2_3_DEPTH, 1 * SPLIT3_SURFACE_2_3_DEPTH, 0 * SPLIT3_SURFACE_2_3_DEPTH))
    split(bisect_by=split3_surface_2_3, keep=Keep.BOTTOM)

    # Chamfer14
    chamfer14_edges = [body_3_3.edges().sort_by_distance(p)[0] for p in [
        (0, 30, 47.5),
    ]]
    chamfer(chamfer14_edges, length=CHAMFER14_SIZE)


with BuildPart() as body_5_2_2:
    add(body_5_2_1.part)

    # Split3 2: split by a surface, the side it looks to stays
    # Split3 surface 2: a surface, the sketch's curves swept straight by 267.36 mm
    with BuildLine(Plane(origin=(0, 0, 0), x_dir=(1, 0, 0), z_dir=(0, 1, 0)).offset(-SPLIT3_SURFACE_2_4_BACK), mode=Mode.PRIVATE) as split3_surface_2_4_path:
        Line((-30, -47.5), (30, -47.5))
    split3_surface_2_4 = Shell.extrude(split3_surface_2_4_path.wire(), (0 * SPLIT3_SURFACE_2_4_DEPTH, 1 * SPLIT3_SURFACE_2_4_DEPTH, 0 * SPLIT3_SURFACE_2_4_DEPTH))
    split(bisect_by=split3_surface_2_4, keep=Keep.TOP)

    # Chamfer12
    chamfer12_edges = [body_5_2_2.edges().sort_by_distance(p)[0] for p in [
        (0, -30, 47.5),
        (0, 30, 17.5),
    ]]
    chamfer(chamfer12_edges, length=CHAMFER12_SIZE)


with BuildPart() as body_2_3_1:
    add(body_2_3.part)

    # Combine3: union body 5 2, body 3 3
    add(body_5_2_2.part)
    add(body_3_3.part)


solid = body_2_3_1.part
